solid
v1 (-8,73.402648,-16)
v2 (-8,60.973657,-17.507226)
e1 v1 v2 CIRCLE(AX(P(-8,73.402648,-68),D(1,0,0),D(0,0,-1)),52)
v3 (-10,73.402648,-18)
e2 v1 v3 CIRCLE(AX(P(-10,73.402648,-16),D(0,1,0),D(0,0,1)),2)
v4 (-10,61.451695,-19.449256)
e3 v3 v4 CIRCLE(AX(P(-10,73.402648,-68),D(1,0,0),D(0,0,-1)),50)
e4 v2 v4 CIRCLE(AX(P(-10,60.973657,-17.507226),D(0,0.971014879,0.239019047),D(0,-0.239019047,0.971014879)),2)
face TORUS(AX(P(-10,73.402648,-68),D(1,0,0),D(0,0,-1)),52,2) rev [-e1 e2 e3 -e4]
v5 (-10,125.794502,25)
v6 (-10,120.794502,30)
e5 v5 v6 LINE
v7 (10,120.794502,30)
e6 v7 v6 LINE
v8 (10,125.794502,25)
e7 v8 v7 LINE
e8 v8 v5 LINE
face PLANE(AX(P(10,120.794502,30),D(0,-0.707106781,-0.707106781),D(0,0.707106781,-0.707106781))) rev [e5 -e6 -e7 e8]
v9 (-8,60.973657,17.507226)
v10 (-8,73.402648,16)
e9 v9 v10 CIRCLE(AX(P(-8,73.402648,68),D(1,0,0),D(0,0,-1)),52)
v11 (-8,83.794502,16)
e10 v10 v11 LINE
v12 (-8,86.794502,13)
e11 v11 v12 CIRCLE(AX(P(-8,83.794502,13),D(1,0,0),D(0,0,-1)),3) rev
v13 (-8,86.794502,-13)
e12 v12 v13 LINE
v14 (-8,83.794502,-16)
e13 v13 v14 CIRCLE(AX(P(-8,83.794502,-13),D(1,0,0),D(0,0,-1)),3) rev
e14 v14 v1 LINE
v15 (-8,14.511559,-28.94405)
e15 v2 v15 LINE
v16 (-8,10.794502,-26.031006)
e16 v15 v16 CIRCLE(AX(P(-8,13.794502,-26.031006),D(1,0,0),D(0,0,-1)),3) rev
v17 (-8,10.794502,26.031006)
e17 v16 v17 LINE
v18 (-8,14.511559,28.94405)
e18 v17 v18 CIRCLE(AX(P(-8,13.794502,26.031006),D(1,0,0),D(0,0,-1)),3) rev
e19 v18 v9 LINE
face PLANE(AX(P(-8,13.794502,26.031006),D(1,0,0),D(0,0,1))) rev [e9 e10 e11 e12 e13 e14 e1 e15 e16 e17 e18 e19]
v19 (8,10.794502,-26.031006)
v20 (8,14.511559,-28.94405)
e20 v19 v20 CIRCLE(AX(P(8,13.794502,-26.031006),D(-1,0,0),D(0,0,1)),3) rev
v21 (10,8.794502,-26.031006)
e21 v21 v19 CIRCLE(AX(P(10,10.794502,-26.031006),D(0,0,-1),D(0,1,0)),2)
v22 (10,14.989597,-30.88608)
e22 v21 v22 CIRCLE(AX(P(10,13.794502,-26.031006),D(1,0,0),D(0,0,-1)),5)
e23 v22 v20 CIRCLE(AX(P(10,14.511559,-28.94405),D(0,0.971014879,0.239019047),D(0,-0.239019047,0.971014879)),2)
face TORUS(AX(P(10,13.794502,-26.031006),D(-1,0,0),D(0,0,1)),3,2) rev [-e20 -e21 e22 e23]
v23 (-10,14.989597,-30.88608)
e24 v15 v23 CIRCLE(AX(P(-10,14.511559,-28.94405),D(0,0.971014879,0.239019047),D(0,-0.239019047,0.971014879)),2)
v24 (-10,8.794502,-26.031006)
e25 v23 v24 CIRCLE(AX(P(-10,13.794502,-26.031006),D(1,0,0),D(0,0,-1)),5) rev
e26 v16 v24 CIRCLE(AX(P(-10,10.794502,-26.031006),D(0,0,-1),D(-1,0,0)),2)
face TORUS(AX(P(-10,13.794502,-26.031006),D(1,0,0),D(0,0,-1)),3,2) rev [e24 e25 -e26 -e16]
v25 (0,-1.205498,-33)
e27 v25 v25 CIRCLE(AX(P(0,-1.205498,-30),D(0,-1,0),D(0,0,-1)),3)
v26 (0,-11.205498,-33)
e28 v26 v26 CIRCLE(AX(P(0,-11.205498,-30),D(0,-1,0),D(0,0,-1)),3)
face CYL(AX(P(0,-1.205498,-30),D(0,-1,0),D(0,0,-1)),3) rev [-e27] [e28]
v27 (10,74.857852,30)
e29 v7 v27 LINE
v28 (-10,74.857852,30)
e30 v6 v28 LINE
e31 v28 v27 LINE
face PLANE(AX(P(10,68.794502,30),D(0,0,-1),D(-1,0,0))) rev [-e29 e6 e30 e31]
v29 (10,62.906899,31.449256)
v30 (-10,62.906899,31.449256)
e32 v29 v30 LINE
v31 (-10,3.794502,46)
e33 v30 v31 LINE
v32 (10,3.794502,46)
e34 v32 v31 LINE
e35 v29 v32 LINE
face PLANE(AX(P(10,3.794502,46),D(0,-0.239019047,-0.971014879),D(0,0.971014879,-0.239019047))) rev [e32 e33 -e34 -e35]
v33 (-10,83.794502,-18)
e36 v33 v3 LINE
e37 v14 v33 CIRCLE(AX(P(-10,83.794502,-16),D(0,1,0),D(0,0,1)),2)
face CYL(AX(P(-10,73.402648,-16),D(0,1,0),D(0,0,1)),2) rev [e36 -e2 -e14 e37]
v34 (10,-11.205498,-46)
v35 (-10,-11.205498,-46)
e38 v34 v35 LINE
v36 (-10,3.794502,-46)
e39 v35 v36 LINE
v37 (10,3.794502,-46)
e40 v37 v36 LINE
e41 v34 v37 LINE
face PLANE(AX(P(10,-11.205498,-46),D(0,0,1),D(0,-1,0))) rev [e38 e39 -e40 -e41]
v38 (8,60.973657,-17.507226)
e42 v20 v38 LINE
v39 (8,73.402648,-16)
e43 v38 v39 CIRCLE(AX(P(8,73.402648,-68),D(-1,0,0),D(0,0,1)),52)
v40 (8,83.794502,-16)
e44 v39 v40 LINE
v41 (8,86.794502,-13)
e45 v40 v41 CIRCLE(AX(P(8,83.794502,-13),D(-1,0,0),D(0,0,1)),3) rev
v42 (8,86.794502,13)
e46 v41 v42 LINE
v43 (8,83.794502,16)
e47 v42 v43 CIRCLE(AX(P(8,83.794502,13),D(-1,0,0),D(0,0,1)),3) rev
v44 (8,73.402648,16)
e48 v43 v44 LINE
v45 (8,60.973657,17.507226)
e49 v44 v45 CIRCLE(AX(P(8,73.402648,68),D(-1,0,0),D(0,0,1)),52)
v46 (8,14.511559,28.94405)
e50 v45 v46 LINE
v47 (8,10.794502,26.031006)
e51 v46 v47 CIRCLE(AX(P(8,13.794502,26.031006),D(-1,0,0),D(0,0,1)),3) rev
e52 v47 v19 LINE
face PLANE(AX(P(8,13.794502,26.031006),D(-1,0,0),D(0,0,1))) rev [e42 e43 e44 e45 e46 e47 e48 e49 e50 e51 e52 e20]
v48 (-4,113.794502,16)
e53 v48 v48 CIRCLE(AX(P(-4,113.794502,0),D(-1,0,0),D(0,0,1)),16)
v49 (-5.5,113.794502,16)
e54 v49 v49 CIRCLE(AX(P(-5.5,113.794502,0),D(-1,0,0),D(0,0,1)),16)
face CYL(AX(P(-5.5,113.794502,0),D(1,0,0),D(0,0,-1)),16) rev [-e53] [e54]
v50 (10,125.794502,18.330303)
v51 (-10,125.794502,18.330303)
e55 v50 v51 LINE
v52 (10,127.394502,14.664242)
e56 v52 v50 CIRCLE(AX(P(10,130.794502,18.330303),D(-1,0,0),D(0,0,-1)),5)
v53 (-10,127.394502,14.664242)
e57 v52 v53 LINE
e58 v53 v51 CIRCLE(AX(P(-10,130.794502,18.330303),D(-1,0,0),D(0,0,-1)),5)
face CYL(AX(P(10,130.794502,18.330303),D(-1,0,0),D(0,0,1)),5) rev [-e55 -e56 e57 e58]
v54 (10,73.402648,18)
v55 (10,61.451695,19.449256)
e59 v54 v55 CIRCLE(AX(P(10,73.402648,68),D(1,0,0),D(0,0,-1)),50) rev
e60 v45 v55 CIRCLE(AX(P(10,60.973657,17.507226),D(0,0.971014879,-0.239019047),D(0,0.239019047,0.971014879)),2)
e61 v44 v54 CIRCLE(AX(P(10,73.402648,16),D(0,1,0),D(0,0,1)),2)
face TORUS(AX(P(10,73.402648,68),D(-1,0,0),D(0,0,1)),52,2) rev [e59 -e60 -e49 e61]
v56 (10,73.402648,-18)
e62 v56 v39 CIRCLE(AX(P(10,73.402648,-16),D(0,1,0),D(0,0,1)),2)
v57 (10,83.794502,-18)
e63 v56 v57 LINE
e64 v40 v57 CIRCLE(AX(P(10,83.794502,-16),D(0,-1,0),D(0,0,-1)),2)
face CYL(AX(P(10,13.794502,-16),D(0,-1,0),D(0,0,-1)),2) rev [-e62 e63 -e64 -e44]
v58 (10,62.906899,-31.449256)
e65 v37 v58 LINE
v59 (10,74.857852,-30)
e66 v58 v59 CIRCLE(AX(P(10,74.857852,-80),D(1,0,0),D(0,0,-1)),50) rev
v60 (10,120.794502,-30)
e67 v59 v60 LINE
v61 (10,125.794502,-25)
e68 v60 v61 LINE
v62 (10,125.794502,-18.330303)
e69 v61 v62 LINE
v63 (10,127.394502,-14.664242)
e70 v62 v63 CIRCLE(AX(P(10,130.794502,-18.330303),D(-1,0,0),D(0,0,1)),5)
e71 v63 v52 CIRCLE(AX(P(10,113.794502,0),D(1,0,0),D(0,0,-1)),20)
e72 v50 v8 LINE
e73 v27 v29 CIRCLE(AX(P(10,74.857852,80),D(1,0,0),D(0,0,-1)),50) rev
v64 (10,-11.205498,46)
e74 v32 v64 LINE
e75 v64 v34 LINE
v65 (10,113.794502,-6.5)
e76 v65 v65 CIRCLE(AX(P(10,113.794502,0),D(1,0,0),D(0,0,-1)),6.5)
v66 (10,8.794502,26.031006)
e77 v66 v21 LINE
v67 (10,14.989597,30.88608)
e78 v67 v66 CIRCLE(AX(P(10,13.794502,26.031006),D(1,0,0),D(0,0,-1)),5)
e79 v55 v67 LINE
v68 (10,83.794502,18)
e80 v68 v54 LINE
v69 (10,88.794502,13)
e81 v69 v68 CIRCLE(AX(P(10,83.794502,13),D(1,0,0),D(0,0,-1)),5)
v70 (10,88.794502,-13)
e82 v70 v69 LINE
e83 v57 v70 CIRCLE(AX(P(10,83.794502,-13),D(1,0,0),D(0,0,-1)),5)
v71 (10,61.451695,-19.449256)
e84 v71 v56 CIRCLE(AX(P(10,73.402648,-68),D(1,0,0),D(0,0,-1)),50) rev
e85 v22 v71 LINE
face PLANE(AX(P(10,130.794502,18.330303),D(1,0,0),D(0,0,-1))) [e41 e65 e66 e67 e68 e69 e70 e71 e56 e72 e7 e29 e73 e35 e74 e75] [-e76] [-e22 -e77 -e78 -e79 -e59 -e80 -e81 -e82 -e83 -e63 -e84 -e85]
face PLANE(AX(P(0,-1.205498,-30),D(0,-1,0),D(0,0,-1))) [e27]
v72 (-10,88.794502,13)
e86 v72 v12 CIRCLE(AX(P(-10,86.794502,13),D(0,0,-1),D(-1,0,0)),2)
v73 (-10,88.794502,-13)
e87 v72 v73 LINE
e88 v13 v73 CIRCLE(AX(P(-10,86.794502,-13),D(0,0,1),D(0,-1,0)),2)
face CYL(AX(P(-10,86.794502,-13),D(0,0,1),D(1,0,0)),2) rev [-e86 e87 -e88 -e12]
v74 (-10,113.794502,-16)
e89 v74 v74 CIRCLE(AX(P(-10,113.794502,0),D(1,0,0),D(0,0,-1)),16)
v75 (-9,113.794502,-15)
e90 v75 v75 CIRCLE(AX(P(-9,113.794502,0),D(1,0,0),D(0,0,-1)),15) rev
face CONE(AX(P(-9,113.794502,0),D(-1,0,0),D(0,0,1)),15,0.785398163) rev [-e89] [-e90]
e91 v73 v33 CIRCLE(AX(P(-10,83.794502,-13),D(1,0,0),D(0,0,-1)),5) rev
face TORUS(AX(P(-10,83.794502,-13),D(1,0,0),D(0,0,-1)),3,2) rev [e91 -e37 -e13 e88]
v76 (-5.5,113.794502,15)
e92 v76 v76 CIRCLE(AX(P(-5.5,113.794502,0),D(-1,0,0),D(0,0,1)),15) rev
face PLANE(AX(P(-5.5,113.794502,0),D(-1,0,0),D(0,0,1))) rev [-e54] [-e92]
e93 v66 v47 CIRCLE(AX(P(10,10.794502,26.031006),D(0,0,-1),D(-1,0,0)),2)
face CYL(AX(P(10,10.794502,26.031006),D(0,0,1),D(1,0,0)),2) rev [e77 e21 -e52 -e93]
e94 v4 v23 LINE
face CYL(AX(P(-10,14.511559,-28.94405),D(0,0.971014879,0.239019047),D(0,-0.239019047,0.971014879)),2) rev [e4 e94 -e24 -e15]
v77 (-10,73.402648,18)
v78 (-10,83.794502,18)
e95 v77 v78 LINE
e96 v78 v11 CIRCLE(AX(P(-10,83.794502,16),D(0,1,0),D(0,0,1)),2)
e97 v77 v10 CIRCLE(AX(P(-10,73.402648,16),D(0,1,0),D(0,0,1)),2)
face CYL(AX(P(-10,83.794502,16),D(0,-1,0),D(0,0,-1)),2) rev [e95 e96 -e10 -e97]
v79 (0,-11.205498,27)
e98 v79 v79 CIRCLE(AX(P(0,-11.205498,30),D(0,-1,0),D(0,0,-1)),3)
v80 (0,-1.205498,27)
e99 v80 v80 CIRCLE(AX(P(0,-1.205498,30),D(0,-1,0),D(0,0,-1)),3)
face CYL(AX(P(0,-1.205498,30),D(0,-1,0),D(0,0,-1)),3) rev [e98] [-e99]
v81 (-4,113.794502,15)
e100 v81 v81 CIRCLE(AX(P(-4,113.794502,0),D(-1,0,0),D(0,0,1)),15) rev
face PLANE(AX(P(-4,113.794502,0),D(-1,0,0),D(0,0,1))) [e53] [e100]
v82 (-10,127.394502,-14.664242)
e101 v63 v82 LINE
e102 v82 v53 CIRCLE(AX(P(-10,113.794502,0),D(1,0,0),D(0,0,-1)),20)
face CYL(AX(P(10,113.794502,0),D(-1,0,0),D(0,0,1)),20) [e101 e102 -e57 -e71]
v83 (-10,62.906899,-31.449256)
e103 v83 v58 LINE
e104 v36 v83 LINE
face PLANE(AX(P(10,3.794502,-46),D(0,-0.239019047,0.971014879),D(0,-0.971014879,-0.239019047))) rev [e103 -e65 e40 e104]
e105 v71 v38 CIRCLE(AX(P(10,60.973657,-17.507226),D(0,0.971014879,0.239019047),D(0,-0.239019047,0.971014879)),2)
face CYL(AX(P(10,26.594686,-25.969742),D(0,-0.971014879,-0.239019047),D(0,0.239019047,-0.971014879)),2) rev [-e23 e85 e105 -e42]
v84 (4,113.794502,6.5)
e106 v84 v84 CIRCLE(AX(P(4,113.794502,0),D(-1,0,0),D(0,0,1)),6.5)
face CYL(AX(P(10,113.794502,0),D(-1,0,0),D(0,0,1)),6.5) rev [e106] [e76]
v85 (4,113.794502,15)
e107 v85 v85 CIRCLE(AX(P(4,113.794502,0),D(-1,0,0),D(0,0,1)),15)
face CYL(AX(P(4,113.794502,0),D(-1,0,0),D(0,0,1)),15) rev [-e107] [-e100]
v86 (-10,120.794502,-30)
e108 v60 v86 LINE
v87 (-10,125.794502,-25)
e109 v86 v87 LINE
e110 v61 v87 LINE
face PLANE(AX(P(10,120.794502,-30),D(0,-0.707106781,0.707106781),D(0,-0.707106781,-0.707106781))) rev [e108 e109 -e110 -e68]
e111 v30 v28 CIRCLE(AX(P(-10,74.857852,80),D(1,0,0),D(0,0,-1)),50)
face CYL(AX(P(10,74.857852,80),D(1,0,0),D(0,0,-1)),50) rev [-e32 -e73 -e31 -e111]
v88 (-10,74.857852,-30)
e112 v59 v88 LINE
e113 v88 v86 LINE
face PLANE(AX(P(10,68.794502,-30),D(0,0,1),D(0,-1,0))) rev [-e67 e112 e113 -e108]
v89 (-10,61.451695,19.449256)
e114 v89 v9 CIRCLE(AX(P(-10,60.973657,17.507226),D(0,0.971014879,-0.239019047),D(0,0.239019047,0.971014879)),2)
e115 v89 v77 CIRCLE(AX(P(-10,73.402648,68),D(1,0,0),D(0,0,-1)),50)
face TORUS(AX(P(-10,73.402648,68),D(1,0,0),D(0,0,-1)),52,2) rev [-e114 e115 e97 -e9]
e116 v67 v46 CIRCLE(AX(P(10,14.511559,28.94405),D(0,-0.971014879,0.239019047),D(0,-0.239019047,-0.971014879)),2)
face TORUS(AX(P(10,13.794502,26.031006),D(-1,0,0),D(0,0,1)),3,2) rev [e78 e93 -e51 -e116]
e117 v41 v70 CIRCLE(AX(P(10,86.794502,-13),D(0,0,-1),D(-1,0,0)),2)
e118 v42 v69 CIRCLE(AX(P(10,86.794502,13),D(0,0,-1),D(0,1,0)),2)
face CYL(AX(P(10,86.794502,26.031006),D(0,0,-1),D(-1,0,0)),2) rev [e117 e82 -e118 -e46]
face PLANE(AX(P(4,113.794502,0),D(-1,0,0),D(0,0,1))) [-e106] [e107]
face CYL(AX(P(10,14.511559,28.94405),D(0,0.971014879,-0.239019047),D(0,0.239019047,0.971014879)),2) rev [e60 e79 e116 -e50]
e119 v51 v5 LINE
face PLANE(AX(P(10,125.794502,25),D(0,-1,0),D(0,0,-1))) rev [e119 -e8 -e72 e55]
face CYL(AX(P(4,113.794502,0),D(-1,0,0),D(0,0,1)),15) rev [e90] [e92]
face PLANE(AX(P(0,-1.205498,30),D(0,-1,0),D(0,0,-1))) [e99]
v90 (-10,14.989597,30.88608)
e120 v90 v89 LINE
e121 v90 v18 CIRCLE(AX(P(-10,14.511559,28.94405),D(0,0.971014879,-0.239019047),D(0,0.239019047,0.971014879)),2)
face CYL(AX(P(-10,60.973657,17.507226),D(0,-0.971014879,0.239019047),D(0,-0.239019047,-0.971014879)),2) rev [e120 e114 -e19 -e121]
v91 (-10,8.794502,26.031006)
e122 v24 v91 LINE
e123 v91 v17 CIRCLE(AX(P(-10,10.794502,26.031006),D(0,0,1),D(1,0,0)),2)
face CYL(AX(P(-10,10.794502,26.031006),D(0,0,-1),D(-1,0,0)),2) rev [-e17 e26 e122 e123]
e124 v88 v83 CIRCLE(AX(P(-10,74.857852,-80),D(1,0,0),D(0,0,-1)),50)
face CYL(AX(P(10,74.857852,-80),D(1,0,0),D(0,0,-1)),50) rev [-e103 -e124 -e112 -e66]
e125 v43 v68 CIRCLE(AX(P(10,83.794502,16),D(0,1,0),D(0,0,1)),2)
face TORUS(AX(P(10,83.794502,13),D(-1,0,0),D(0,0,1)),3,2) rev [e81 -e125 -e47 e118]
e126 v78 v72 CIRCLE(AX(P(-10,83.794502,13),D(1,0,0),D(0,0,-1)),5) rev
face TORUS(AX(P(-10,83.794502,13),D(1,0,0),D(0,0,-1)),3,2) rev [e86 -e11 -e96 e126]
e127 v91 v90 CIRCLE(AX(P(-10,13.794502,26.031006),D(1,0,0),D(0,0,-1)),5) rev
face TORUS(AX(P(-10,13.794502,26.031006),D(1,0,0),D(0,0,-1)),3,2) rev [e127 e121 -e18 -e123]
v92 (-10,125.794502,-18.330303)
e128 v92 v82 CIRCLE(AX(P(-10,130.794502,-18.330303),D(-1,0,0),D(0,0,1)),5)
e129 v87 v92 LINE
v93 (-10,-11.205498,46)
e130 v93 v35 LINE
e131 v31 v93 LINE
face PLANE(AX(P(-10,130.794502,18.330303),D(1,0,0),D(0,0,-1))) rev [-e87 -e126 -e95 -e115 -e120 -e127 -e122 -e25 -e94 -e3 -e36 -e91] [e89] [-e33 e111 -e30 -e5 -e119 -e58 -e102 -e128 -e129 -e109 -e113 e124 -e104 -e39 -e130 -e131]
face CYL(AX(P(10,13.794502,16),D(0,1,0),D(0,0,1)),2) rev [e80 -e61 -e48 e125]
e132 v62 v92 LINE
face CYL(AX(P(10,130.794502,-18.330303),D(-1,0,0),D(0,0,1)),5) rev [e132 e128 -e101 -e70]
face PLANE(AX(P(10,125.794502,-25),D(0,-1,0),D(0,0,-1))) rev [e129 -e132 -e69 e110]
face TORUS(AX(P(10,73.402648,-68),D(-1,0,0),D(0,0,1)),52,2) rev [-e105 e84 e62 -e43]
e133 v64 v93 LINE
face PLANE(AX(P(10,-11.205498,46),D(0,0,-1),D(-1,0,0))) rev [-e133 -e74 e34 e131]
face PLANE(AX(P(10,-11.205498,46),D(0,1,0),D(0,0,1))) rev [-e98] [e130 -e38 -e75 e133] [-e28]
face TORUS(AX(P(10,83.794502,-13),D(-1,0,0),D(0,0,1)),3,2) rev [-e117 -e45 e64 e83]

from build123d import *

# Parameters (mm, degrees)
SKETCH1_R            = 6.5
BOSS_EXTRUDE1_DEPTH  = 10
CUT_EXTRUDE1_DEPTH   = 2
FILLET1_R            = 2
FILLET1_OF_MIRROR4_R = 2
FILLET2_R            = 50
SKETCH3_R            = 3
CUT_EXTRUDE2_DEPTH   = 10
SKETCH4_R            = 15
CUT_EXTRUDE3_DEPTH   = 14
CHAMFER1_SIZE        = 1
CUT_EXTRUDE4_START   = -6
SKETCH5_R            = 16
CUT_EXTRUDE4_DEPTH   = 1.5


with BuildPart() as part:
    # Sketch1 → Boss-Extrude1 (new, symmetric)
    with BuildSketch(Plane(origin=(0, 0, 0), x_dir=(0, 0, -1), z_dir=(1, 0, 0))):
        with BuildLine():
            Line((-46, -11.205497968), (46, -11.205497968))
            Line((46, -11.205497968), (46, 3.794502032))
            Line((46, 3.794502032), (30, 68.794502032))
            Line((30, 68.794502032), (30, 120.794502032))
            Line((30, 120.794502032), (25, 125.794502032))
            Line((25, 125.794502032), (18.33030278, 125.794502032))
            ThreePointArc((18.33030278, 125.794502032), (16.33030278, 126.211926337), (14.664242224, 127.394502032))
            ThreePointArc((14.664242224, 127.394502032), (0, 133.794502032), (-14.664242224, 127.394502032))
            ThreePointArc((-14.664242224, 127.394502032), (-16.33030278, 126.211926337), (-18.33030278, 125.794502032))
            Line((-18.33030278, 125.794502032), (-25, 125.794502032))
            Line((-25, 125.794502032), (-30, 120.794502032))
            Line((-30, 120.794502032), (-30, 68.794502032))
            Line((-30, 68.794502032), (-46, 3.794502032))
            Line((-46, 3.794502032), (-46, -11.205497968))
        make_face()
        with Locations((0, 113.794502032)):
            Circle(SKETCH1_R, mode=Mode.SUBTRACT)
    extrude(amount=BOSS_EXTRUDE1_DEPTH, both=True)

    # Sketch2 → Cut-Extrude1 (cut, symmetric)
    with BuildSketch(Plane(origin=(10, 0, 0), x_dir=(0, 0, -1), z_dir=(1, 0, 0))):
        with BuildLine():
            Line((13, 88.794502032), (-13, 88.794502032))
            ThreePointArc((-13, 88.794502032), (-16.535533906, 87.330035938), (-18, 83.794502032))
            Line((-18, 83.794502032), (-18, 73.402647758))
            ThreePointArc((-18, 73.402647758), (-18.363636327, 67.383395202), (-19.449256053, 61.451695402))
            Line((-19.449256053, 61.451695402), (-30.886080209, 14.989597267))
            ThreePointArc((-30.886080209, 14.989597267), (-29.966452179, 10.710306527), (-26.031005815, 8.794502032))
            Line((-26.031005815, 8.794502032), (26.031005815, 8.794502032))
            ThreePointArc((26.031005815, 8.794502032), (29.966452179, 10.710306527), (30.886080209, 14.989597267))
            Line((30.886080209, 14.989597267), (19.449256053, 61.451695402))
            ThreePointArc((19.449256053, 61.451695402), (18.363636327, 67.383395202), (18, 73.402647758))
            Line((18, 73.402647758), (18, 83.794502032))
            ThreePointArc((18, 83.794502032), (16.535533906, 87.330035938), (13, 88.794502032))
        make_face()
    cut_extrude1 = extrude(amount=CUT_EXTRUDE1_DEPTH, both=True, mode=Mode.SUBTRACT)

    # Fillet1
    fillet1_edges = [part.edges().sort_by_distance(p)[0] for p in [
        (8, 38.220646335, 25.167668131),
        (8, 67.383395202, 18.363636327),
        (8, 78.598574895, 18),
        (8, 87.330035938, 16.535533906),
        (8, 88.794502032, 0),
        (8, 87.330035938, -16.535533906),
        (8, 78.598574895, -18),
        (8, 67.383395202, -18.363636327),
        (8, 38.220646335, -25.167668131),
        (8, 10.710306527, -29.966452179),
        (8, 8.794502032, 0),
        (8, 10.710306527, 29.966452179),
    ]]
    fillet(fillet1_edges, radius=FILLET1_R - 0.0001)  # a hair under: the kernel refuses the full size

    # Mirror4: Cut-Extrude1 across plane
    add(cut_extrude1.mirror(Plane(origin=(0, 0, 0), x_dir=(0, 0, 1), z_dir=(1, 0, 0))), mode=Mode.SUBTRACT)

    # Fillet1 of Mirror4
    fillet1_of_mirror4_edges = [part.edges().sort_by_distance(p)[0] for p in [
        (-8, 38.220646335, 25.167668131),
        (-8, 67.383395202, 18.363636327),
        (-8, 78.598574895, 18),
        (-8, 87.330035938, 16.535533906),
        (-8, 88.794502032, 0),
        (-8, 87.330035938, -16.535533906),
        (-8, 78.598574895, -18),
        (-8, 67.383395202, -18.363636327),
        (-8, 38.220646335, -25.167668131),
        (-8, 10.710306527, -29.966452179),
        (-8, 8.794502032, 0),
        (-8, 10.710306527, 29.966452179),
    ]]
    fillet(fillet1_of_mirror4_edges, radius=FILLET1_OF_MIRROR4_R - 0.0001)  # a hair under: the kernel refuses the full size

    # Fillet2
    fillet2_edges = [part.edges().sort_by_distance(p)[0] for p in [
        (0, 68.794502032, 30),
        (0, 68.794502032, -30),
    ]]
    fillet(fillet2_edges, radius=FILLET2_R)

    # Sketch3 → Cut-Extrude2 (cut)
    with BuildSketch(Plane.XZ.offset(11.205497968)):
        with Locations(Location((0, 30, 0), (0, 0, 270))):
            Circle(SKETCH3_R)
        with Locations(Location((0, -30, 0), (0, 0, 270))):
            Circle(SKETCH3_R)
    extrude(amount=-CUT_EXTRUDE2_DEPTH, mode=Mode.SUBTRACT)

    # Sketch4 → Cut-Extrude3 (cut)
    with BuildSketch(Plane.ZY.offset(10)):
        with Locations((0, 113.794502032)):
            Circle(SKETCH4_R)
    extrude(amount=-CUT_EXTRUDE3_DEPTH, mode=Mode.SUBTRACT)

    # Chamfer1
    chamfer1_edges = [part.edges().sort_by_distance(p)[0] for p in [
        (-10, 113.794502032, -15),
    ]]
    chamfer(chamfer1_edges, length=CHAMFER1_SIZE)

    # Sketch5 → Cut-Extrude4 (cut)
    with BuildSketch(Plane.ZY.offset(10).offset(CUT_EXTRUDE4_START)):
        with Locations((0, 113.794502032)):
            Circle(SKETCH5_R)
    extrude(amount=CUT_EXTRUDE4_DEPTH, mode=Mode.SUBTRACT)


solid = part.part
